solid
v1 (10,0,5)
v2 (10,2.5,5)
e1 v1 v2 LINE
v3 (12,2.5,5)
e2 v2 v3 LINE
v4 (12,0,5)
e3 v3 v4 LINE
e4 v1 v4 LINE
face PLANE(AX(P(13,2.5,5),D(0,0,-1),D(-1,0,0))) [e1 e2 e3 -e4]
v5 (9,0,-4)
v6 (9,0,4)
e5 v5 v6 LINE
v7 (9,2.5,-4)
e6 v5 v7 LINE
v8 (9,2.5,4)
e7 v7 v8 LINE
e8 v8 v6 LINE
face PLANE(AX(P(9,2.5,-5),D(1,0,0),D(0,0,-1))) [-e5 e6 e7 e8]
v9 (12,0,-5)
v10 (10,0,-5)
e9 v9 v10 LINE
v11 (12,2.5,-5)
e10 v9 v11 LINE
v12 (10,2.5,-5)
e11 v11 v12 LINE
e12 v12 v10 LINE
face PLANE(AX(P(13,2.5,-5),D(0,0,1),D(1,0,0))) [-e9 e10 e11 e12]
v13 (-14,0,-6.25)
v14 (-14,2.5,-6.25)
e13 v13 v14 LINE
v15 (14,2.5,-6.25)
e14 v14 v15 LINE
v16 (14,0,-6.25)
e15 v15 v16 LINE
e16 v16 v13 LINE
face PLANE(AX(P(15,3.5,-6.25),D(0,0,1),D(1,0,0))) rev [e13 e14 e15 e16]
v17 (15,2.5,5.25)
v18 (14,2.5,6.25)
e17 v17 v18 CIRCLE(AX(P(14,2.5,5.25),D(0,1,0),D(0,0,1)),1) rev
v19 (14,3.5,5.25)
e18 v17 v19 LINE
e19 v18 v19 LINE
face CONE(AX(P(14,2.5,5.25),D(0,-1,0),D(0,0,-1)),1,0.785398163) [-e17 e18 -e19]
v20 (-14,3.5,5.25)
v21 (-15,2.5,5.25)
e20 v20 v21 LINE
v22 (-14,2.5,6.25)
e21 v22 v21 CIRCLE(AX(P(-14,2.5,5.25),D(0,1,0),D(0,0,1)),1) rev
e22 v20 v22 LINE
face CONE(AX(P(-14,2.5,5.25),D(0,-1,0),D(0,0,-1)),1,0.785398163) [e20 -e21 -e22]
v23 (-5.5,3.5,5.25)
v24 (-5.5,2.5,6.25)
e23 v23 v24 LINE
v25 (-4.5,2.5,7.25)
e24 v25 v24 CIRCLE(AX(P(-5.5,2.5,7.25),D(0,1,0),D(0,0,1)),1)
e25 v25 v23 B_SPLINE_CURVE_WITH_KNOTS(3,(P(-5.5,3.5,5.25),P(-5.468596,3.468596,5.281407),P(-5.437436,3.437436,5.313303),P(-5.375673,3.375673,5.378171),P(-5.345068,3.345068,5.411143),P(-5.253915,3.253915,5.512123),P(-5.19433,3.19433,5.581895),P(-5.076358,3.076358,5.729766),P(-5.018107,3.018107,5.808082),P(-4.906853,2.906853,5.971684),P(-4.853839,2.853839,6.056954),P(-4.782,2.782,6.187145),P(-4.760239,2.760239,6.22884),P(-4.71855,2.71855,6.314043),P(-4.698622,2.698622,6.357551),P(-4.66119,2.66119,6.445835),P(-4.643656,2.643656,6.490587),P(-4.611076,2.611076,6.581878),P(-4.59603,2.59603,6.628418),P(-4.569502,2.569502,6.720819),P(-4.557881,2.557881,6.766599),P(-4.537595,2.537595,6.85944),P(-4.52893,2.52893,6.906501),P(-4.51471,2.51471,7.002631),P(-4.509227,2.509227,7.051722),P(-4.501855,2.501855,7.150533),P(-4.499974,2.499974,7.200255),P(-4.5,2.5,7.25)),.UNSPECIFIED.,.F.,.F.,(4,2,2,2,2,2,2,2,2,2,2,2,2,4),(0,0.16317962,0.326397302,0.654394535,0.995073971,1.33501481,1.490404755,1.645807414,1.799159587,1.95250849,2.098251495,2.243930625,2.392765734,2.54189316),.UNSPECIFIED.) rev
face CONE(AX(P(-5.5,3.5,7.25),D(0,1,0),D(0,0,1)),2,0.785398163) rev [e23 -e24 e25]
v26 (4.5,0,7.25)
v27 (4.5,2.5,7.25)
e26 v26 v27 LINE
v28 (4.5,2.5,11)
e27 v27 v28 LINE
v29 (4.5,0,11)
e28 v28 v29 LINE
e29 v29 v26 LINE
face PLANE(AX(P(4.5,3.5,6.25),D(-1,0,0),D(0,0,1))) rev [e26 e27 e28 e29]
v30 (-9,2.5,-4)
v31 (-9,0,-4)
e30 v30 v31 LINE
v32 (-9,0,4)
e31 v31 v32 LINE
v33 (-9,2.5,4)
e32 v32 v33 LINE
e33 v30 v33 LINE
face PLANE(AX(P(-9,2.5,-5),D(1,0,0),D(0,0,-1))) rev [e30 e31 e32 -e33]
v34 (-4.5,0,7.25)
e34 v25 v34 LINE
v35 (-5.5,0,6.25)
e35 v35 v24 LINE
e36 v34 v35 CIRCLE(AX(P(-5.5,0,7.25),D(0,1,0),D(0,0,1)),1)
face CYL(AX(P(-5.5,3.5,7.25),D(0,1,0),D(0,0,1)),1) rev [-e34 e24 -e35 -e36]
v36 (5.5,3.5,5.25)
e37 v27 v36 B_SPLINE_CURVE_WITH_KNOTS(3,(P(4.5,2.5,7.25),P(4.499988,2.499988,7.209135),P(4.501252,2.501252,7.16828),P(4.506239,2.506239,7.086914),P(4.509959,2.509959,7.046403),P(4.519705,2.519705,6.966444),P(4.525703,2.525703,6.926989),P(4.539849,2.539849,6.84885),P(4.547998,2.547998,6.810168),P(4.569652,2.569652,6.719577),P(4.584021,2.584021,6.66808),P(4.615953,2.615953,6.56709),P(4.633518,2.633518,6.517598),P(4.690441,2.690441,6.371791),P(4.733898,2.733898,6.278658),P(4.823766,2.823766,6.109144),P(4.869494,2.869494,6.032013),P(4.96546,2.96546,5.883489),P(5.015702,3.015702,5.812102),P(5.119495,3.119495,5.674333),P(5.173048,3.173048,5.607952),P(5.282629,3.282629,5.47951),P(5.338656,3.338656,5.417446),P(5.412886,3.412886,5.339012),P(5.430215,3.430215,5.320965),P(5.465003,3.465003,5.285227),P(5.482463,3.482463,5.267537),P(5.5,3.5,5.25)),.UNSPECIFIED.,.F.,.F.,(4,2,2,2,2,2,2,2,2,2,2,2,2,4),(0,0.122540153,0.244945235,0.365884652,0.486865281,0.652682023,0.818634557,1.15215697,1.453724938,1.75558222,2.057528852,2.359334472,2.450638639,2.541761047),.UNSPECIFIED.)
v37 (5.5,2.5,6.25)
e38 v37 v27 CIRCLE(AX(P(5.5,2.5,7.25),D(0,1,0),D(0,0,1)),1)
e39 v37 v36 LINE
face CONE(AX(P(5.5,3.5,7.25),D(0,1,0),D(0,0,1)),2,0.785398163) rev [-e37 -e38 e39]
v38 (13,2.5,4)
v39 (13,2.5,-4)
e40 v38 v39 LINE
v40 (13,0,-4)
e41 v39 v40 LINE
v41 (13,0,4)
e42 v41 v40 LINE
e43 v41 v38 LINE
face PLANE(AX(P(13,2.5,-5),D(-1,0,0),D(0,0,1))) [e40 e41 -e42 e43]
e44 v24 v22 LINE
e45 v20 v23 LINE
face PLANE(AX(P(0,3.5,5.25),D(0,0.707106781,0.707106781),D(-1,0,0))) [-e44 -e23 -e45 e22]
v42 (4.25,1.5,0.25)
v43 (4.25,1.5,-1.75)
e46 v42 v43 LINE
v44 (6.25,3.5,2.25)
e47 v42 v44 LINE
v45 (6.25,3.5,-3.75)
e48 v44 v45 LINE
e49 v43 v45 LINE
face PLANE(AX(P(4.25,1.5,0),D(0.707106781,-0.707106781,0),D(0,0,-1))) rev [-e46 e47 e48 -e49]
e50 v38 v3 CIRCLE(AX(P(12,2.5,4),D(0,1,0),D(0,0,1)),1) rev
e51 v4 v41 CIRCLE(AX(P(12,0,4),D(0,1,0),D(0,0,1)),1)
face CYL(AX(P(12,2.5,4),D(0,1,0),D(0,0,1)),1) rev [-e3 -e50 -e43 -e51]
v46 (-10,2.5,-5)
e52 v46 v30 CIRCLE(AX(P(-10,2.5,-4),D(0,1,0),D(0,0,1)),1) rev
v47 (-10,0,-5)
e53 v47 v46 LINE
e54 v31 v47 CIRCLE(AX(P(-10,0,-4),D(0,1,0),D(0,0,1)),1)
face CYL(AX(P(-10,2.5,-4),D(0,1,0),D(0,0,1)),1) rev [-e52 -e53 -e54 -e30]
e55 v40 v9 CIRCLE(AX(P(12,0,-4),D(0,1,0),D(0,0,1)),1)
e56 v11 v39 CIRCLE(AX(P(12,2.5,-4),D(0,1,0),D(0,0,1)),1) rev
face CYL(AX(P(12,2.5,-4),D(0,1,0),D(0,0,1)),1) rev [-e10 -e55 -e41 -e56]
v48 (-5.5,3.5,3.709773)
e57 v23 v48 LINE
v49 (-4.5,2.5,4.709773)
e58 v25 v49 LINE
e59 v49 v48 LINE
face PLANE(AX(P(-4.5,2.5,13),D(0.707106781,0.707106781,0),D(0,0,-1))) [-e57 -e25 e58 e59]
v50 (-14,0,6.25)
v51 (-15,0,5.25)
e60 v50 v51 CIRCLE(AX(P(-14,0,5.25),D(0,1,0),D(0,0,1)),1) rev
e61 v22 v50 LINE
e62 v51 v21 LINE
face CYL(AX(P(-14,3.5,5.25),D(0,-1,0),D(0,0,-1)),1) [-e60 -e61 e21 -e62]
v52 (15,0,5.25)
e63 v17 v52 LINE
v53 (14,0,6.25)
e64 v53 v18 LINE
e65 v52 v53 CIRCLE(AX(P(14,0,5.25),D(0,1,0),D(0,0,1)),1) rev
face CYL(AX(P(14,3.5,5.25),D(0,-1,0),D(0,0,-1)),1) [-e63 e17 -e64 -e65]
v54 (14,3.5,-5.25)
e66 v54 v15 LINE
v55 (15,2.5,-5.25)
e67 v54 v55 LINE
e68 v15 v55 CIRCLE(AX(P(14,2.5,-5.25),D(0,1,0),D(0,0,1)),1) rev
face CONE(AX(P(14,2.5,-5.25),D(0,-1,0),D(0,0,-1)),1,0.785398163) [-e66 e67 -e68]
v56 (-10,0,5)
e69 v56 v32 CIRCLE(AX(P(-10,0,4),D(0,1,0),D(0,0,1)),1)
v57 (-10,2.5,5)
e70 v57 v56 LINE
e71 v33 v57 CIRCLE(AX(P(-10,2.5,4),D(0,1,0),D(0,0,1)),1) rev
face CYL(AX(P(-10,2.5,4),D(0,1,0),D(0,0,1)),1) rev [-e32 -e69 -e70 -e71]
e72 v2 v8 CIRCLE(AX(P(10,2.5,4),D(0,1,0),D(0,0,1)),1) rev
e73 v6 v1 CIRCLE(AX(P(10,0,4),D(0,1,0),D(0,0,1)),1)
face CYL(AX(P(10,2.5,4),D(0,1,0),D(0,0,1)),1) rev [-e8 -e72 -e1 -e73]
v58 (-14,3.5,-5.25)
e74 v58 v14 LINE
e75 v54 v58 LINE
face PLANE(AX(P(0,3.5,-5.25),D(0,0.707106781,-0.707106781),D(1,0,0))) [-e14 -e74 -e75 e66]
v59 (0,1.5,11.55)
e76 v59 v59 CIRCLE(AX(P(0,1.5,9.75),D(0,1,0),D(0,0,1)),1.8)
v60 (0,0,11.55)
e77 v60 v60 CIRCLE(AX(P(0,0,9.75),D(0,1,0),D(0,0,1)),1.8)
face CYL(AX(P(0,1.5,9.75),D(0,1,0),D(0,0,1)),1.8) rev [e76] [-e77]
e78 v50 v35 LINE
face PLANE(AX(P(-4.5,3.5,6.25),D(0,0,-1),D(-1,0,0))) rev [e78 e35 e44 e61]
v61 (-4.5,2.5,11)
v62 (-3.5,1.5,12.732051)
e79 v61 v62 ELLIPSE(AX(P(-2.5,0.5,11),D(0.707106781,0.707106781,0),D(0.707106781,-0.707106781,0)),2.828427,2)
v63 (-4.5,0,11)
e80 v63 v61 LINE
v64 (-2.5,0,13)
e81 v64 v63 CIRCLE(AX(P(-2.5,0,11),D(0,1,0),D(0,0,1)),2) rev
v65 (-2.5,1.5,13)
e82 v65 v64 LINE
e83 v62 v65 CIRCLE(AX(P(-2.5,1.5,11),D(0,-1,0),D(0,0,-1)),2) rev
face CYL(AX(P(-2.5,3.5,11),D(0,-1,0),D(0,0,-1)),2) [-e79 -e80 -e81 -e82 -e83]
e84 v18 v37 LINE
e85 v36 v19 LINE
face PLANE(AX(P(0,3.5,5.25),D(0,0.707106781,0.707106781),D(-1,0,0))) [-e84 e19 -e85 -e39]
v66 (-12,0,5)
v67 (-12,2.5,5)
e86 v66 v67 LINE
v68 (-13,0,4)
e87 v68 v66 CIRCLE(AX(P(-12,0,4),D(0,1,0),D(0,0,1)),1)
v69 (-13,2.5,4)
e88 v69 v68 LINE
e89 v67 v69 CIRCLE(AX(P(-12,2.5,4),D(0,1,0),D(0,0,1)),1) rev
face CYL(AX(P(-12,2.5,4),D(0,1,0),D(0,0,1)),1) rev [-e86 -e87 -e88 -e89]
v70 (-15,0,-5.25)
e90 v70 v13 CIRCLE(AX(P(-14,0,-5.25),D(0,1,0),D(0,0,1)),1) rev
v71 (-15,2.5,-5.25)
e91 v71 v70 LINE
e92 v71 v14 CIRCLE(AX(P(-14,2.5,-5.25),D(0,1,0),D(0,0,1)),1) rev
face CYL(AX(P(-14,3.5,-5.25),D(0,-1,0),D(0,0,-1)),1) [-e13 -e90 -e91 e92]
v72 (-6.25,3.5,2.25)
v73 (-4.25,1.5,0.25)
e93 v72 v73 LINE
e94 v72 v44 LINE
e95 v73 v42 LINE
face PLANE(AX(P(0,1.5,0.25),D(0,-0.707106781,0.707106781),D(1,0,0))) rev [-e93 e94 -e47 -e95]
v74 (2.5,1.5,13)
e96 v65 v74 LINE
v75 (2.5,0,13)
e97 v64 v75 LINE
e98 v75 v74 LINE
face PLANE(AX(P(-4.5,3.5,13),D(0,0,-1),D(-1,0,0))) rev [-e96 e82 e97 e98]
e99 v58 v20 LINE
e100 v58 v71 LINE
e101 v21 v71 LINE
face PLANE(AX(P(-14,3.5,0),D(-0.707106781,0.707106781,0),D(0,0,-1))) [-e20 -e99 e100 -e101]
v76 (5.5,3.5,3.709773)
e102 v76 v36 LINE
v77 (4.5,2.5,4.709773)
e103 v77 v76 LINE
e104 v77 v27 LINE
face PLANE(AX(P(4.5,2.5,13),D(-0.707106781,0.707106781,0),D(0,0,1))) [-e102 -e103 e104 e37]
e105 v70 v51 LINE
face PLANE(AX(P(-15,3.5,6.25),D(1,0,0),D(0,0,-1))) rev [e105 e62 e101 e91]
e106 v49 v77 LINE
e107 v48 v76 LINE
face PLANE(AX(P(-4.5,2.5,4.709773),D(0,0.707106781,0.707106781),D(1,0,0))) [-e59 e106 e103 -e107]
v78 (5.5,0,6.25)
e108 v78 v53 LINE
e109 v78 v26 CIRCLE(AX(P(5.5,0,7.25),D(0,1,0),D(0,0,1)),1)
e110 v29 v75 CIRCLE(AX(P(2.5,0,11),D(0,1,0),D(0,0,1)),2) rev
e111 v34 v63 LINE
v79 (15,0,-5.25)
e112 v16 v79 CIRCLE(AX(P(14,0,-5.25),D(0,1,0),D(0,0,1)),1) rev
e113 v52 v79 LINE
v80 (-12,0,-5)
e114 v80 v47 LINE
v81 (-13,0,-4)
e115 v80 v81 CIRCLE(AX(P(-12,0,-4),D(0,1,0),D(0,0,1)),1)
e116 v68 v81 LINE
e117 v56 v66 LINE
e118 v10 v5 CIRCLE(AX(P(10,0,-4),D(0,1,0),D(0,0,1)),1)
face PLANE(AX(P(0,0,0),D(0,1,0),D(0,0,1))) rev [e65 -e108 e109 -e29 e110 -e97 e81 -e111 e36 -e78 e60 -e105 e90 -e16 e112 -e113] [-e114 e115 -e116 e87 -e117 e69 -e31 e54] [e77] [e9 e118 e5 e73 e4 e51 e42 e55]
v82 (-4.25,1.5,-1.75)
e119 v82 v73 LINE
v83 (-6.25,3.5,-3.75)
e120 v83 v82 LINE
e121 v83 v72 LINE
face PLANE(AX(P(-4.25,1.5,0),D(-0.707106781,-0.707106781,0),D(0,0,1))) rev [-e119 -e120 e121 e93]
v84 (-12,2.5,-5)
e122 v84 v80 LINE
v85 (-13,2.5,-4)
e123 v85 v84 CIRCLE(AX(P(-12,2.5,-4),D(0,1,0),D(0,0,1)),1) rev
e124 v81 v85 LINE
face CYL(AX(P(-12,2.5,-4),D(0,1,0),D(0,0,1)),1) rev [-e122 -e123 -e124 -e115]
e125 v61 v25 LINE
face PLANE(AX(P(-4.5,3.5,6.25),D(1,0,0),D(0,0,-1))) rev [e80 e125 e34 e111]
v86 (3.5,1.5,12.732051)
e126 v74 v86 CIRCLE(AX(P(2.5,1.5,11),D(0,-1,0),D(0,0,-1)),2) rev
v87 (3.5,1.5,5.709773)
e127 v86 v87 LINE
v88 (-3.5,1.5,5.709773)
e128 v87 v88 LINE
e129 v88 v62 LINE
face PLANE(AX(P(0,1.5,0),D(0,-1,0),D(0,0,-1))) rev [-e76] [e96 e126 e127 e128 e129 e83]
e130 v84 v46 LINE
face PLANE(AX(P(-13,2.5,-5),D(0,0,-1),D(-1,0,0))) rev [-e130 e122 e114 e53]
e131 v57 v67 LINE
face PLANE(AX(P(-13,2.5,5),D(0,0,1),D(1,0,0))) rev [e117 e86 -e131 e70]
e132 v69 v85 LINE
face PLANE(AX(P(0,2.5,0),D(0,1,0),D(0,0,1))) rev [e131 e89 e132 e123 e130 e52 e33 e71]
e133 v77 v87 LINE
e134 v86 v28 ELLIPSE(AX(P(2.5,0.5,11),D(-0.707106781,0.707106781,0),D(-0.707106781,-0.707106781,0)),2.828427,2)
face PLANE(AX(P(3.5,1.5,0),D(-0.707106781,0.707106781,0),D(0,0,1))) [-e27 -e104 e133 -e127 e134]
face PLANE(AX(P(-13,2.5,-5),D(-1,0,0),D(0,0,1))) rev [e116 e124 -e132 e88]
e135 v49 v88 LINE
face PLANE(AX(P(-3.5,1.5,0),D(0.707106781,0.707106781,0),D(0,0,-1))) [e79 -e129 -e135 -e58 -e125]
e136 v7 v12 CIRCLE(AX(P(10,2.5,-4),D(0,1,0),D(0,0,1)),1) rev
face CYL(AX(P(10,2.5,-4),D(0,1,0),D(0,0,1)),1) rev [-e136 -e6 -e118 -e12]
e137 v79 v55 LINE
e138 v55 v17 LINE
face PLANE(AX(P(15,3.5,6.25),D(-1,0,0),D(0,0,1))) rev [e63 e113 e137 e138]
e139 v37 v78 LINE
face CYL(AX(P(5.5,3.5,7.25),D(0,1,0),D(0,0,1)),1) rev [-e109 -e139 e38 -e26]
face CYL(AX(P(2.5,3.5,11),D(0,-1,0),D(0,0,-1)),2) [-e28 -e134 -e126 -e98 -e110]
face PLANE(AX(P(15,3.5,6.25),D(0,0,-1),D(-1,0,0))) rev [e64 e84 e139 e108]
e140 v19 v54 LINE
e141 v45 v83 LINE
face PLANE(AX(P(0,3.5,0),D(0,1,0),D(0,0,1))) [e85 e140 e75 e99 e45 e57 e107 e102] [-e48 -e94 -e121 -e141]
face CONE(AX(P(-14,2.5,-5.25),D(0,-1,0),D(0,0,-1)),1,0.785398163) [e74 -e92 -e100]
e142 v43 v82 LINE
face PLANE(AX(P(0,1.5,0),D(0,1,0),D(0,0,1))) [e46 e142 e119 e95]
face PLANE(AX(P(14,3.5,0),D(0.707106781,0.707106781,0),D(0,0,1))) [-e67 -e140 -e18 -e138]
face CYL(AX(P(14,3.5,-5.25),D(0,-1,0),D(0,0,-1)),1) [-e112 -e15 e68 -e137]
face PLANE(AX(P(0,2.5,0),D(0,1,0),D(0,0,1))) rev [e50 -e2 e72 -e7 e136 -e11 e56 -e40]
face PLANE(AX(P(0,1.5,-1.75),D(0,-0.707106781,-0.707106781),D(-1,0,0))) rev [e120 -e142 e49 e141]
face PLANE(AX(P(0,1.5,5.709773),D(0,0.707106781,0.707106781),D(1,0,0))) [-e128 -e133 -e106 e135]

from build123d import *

# Parameters (mm, degrees)
BOSS_EXTRUDE1_DEPTH  = 3.5
SKETCH2_W            = 4
SKETCH2_H            = 10
CUT_EXTRUDE1_DEPTH   = 2.5
FILLET1_R            = 1
FILLET2_R            = 1
FILLET2_OF_MIRROR1_R = 1
SKETCH3_W            = 9
SKETCH3_H            = 8.290227197
CUT_EXTRUDE3_DEPTH   = 2
CHAMFER2_START       = 4.709772803
CHAMFER2_DEPTH       = 8.290227197
CHAMFER2_START_2     = 3
CHAMFER2_2_DEPTH     = 2.09807924
CHAMFER3_SIZE        = 1
M3_CLEARANCE_HOLE2_D = 3.6
FILLET4_R            = 2
SKETCH13_W           = 12.5
SKETCH13_H           = 6
CUT_EXTRUDE4_DEPTH   = 2
CHAMFER4_SIZE        = 2


with BuildPart() as part:
    # Sketch1 → Boss-Extrude1 (new body)
    with BuildSketch(Plane(origin=(0, 0, 0), x_dir=(1, 0, 0), z_dir=(0, 1, 0))):
        Polygon((-4.5, -6.25), (-15, -6.25), (-15, 6.25), (15, 6.25), (15, -6.25), (4.5, -6.25), (4.5, -13), (-4.5, -13), align=None)
    extrude(amount=BOSS_EXTRUDE1_DEPTH)

    # Sketch2 → Cut-Extrude1 (cut)
    with BuildSketch(Plane.XZ):
        with Locations((-11, 0)):
            Rectangle(SKETCH2_W, SKETCH2_H)
    cut_extrude1 = extrude(amount=-CUT_EXTRUDE1_DEPTH, mode=Mode.SUBTRACT)

    # Fillet1
    fillet1_edges = [part.edges().sort_by_distance(p)[0] for p in [
        (-15, 1.75, -6.25),
        (15, 1.75, -6.25),
        (15, 1.75, 6.25),
        (4.5, 1.75, 6.25),
        (-4.5, 1.75, 6.25),
        (-15, 1.75, 6.25),
    ]]
    fillet(fillet1_edges, radius=FILLET1_R)

    # Fillet2
    fillet2_edges = [part.edges().sort_by_distance(p)[0] for p in [
        (-9, 1.25, 5),
        (-9, 1.25, -5),
        (-13, 1.25, -5),
        (-13, 1.25, 5),
    ]]
    fillet(fillet2_edges, radius=FILLET2_R)

    # Mirror1: Cut-Extrude1 across plane
    add(cut_extrude1.mirror(Plane(origin=(0, 0, 0), x_dir=(0, 0, 1), z_dir=(1, 0, 0))), mode=Mode.SUBTRACT)

    # Fillet2 of Mirror1
    fillet2_of_mirror1_edges = [part.edges().sort_by_distance(p)[0] for p in [
        (9, 1.25, 5),
        (9, 1.25, -5),
        (13, 1.25, -5),
        (13, 1.25, 5),
    ]]
    fillet(fillet2_of_mirror1_edges, radius=FILLET2_OF_MIRROR1_R)

    # Sketch3 → Cut-Extrude3 (cut)
    with BuildSketch(Plane(origin=(0, 3.5, 0), x_dir=(1, 0, 0), z_dir=(0, 1, 0))):
        with Locations((0, -8.854886401)):
            Rectangle(SKETCH3_W, SKETCH3_H)
    extrude(amount=-CUT_EXTRUDE3_DEPTH, mode=Mode.SUBTRACT)

    # Chamfer2: read off the stored shape, not the designer's step
    # Chamfer2 outline → Chamfer2 (add)
    with BuildSketch(Plane.XY.offset(CHAMFER2_START)):
        Polygon((4.5, 2.5), (3.5, 1.5), (4.5, 1.5), align=None)
        Polygon((-4.5, 2.5), (-4.5, 1.5), (-3.5, 1.5), align=None)
    extrude(amount=CHAMFER2_DEPTH)

    # Chamfer2 2 outline → Chamfer2 2 (add)
    with BuildSketch(Plane(origin=(0, 0, 0), x_dir=(1, 0, 0), z_dir=(0, 0.70710678118655, 0.707106781186545)).offset(CHAMFER2_START_2)):
        Polygon((4.5, -1.562545334), (-4.5, -1.562545334), (-3.5, -2.976758896), (3.5, -2.976758896), align=None)
    extrude(amount=CHAMFER2_2_DEPTH)

    # Chamfer3
    chamfer3_edges = [part.edges().sort_by_distance(p)[0] for p in [
        (-4.792893219, 3.5, 6.542893219),
        (-9.75, 3.5, 6.25),
        (-14.707106781, 3.5, 5.957106781),
        (-15, 3.5, 0),
        (-14.707106781, 3.5, -5.957106781),
        (0, 3.5, -6.25),
        (14.707106781, 3.5, -5.957106781),
        (15, 3.5, 0),
        (14.707106781, 3.5, 5.957106781),
        (9.75, 3.5, 6.25),
        (4.792893219, 3.5, 6.542893219),
        (4.5, 3.5, 5.979886401),
        (0, 3.5, 4.709772803),
        (-4.5, 3.5, 5.979886401),
    ]]
    chamfer(chamfer3_edges, length=CHAMFER3_SIZE - 0.0001)  # a hair under: the kernel refuses the full size

    # M3 Clearance Hole2 (through all)
    with Locations(Plane(origin=(0, 1.5, 0), x_dir=(1, 0, 0), z_dir=(0, 1, 0))):
        with Locations((0, -9.75)):
            Hole(M3_CLEARANCE_HOLE2_D / 2)

    # Fillet4
    fillet4_edges = [part.edges().sort_by_distance(p)[0] for p in [
        (4.5, 1.25, 13),
        (-4.5, 1.25, 13),
    ]]
    fillet(fillet4_edges, radius=FILLET4_R)

    # Sketch13 → Cut-Extrude4 (cut)
    with BuildSketch(Plane(origin=(0, 3.5, 0), x_dir=(1, 0, 0), z_dir=(0, 1, 0))):
        with Locations((0, 0.75)):
            Rectangle(SKETCH13_W, SKETCH13_H)
    extrude(amount=-CUT_EXTRUDE4_DEPTH, mode=Mode.SUBTRACT)

    # Chamfer4
    chamfer4_edges = [part.edges().sort_by_distance(p)[0] for p in [
        (0, 1.5, -3.75),
        (6.25, 1.5, -0.75),
        (0, 1.5, 2.25),
        (-6.25, 1.5, -0.75),
    ]]
    chamfer(chamfer4_edges, length=CHAMFER4_SIZE - 0.0001)  # a hair under: the kernel refuses the full size


solid = part.part
